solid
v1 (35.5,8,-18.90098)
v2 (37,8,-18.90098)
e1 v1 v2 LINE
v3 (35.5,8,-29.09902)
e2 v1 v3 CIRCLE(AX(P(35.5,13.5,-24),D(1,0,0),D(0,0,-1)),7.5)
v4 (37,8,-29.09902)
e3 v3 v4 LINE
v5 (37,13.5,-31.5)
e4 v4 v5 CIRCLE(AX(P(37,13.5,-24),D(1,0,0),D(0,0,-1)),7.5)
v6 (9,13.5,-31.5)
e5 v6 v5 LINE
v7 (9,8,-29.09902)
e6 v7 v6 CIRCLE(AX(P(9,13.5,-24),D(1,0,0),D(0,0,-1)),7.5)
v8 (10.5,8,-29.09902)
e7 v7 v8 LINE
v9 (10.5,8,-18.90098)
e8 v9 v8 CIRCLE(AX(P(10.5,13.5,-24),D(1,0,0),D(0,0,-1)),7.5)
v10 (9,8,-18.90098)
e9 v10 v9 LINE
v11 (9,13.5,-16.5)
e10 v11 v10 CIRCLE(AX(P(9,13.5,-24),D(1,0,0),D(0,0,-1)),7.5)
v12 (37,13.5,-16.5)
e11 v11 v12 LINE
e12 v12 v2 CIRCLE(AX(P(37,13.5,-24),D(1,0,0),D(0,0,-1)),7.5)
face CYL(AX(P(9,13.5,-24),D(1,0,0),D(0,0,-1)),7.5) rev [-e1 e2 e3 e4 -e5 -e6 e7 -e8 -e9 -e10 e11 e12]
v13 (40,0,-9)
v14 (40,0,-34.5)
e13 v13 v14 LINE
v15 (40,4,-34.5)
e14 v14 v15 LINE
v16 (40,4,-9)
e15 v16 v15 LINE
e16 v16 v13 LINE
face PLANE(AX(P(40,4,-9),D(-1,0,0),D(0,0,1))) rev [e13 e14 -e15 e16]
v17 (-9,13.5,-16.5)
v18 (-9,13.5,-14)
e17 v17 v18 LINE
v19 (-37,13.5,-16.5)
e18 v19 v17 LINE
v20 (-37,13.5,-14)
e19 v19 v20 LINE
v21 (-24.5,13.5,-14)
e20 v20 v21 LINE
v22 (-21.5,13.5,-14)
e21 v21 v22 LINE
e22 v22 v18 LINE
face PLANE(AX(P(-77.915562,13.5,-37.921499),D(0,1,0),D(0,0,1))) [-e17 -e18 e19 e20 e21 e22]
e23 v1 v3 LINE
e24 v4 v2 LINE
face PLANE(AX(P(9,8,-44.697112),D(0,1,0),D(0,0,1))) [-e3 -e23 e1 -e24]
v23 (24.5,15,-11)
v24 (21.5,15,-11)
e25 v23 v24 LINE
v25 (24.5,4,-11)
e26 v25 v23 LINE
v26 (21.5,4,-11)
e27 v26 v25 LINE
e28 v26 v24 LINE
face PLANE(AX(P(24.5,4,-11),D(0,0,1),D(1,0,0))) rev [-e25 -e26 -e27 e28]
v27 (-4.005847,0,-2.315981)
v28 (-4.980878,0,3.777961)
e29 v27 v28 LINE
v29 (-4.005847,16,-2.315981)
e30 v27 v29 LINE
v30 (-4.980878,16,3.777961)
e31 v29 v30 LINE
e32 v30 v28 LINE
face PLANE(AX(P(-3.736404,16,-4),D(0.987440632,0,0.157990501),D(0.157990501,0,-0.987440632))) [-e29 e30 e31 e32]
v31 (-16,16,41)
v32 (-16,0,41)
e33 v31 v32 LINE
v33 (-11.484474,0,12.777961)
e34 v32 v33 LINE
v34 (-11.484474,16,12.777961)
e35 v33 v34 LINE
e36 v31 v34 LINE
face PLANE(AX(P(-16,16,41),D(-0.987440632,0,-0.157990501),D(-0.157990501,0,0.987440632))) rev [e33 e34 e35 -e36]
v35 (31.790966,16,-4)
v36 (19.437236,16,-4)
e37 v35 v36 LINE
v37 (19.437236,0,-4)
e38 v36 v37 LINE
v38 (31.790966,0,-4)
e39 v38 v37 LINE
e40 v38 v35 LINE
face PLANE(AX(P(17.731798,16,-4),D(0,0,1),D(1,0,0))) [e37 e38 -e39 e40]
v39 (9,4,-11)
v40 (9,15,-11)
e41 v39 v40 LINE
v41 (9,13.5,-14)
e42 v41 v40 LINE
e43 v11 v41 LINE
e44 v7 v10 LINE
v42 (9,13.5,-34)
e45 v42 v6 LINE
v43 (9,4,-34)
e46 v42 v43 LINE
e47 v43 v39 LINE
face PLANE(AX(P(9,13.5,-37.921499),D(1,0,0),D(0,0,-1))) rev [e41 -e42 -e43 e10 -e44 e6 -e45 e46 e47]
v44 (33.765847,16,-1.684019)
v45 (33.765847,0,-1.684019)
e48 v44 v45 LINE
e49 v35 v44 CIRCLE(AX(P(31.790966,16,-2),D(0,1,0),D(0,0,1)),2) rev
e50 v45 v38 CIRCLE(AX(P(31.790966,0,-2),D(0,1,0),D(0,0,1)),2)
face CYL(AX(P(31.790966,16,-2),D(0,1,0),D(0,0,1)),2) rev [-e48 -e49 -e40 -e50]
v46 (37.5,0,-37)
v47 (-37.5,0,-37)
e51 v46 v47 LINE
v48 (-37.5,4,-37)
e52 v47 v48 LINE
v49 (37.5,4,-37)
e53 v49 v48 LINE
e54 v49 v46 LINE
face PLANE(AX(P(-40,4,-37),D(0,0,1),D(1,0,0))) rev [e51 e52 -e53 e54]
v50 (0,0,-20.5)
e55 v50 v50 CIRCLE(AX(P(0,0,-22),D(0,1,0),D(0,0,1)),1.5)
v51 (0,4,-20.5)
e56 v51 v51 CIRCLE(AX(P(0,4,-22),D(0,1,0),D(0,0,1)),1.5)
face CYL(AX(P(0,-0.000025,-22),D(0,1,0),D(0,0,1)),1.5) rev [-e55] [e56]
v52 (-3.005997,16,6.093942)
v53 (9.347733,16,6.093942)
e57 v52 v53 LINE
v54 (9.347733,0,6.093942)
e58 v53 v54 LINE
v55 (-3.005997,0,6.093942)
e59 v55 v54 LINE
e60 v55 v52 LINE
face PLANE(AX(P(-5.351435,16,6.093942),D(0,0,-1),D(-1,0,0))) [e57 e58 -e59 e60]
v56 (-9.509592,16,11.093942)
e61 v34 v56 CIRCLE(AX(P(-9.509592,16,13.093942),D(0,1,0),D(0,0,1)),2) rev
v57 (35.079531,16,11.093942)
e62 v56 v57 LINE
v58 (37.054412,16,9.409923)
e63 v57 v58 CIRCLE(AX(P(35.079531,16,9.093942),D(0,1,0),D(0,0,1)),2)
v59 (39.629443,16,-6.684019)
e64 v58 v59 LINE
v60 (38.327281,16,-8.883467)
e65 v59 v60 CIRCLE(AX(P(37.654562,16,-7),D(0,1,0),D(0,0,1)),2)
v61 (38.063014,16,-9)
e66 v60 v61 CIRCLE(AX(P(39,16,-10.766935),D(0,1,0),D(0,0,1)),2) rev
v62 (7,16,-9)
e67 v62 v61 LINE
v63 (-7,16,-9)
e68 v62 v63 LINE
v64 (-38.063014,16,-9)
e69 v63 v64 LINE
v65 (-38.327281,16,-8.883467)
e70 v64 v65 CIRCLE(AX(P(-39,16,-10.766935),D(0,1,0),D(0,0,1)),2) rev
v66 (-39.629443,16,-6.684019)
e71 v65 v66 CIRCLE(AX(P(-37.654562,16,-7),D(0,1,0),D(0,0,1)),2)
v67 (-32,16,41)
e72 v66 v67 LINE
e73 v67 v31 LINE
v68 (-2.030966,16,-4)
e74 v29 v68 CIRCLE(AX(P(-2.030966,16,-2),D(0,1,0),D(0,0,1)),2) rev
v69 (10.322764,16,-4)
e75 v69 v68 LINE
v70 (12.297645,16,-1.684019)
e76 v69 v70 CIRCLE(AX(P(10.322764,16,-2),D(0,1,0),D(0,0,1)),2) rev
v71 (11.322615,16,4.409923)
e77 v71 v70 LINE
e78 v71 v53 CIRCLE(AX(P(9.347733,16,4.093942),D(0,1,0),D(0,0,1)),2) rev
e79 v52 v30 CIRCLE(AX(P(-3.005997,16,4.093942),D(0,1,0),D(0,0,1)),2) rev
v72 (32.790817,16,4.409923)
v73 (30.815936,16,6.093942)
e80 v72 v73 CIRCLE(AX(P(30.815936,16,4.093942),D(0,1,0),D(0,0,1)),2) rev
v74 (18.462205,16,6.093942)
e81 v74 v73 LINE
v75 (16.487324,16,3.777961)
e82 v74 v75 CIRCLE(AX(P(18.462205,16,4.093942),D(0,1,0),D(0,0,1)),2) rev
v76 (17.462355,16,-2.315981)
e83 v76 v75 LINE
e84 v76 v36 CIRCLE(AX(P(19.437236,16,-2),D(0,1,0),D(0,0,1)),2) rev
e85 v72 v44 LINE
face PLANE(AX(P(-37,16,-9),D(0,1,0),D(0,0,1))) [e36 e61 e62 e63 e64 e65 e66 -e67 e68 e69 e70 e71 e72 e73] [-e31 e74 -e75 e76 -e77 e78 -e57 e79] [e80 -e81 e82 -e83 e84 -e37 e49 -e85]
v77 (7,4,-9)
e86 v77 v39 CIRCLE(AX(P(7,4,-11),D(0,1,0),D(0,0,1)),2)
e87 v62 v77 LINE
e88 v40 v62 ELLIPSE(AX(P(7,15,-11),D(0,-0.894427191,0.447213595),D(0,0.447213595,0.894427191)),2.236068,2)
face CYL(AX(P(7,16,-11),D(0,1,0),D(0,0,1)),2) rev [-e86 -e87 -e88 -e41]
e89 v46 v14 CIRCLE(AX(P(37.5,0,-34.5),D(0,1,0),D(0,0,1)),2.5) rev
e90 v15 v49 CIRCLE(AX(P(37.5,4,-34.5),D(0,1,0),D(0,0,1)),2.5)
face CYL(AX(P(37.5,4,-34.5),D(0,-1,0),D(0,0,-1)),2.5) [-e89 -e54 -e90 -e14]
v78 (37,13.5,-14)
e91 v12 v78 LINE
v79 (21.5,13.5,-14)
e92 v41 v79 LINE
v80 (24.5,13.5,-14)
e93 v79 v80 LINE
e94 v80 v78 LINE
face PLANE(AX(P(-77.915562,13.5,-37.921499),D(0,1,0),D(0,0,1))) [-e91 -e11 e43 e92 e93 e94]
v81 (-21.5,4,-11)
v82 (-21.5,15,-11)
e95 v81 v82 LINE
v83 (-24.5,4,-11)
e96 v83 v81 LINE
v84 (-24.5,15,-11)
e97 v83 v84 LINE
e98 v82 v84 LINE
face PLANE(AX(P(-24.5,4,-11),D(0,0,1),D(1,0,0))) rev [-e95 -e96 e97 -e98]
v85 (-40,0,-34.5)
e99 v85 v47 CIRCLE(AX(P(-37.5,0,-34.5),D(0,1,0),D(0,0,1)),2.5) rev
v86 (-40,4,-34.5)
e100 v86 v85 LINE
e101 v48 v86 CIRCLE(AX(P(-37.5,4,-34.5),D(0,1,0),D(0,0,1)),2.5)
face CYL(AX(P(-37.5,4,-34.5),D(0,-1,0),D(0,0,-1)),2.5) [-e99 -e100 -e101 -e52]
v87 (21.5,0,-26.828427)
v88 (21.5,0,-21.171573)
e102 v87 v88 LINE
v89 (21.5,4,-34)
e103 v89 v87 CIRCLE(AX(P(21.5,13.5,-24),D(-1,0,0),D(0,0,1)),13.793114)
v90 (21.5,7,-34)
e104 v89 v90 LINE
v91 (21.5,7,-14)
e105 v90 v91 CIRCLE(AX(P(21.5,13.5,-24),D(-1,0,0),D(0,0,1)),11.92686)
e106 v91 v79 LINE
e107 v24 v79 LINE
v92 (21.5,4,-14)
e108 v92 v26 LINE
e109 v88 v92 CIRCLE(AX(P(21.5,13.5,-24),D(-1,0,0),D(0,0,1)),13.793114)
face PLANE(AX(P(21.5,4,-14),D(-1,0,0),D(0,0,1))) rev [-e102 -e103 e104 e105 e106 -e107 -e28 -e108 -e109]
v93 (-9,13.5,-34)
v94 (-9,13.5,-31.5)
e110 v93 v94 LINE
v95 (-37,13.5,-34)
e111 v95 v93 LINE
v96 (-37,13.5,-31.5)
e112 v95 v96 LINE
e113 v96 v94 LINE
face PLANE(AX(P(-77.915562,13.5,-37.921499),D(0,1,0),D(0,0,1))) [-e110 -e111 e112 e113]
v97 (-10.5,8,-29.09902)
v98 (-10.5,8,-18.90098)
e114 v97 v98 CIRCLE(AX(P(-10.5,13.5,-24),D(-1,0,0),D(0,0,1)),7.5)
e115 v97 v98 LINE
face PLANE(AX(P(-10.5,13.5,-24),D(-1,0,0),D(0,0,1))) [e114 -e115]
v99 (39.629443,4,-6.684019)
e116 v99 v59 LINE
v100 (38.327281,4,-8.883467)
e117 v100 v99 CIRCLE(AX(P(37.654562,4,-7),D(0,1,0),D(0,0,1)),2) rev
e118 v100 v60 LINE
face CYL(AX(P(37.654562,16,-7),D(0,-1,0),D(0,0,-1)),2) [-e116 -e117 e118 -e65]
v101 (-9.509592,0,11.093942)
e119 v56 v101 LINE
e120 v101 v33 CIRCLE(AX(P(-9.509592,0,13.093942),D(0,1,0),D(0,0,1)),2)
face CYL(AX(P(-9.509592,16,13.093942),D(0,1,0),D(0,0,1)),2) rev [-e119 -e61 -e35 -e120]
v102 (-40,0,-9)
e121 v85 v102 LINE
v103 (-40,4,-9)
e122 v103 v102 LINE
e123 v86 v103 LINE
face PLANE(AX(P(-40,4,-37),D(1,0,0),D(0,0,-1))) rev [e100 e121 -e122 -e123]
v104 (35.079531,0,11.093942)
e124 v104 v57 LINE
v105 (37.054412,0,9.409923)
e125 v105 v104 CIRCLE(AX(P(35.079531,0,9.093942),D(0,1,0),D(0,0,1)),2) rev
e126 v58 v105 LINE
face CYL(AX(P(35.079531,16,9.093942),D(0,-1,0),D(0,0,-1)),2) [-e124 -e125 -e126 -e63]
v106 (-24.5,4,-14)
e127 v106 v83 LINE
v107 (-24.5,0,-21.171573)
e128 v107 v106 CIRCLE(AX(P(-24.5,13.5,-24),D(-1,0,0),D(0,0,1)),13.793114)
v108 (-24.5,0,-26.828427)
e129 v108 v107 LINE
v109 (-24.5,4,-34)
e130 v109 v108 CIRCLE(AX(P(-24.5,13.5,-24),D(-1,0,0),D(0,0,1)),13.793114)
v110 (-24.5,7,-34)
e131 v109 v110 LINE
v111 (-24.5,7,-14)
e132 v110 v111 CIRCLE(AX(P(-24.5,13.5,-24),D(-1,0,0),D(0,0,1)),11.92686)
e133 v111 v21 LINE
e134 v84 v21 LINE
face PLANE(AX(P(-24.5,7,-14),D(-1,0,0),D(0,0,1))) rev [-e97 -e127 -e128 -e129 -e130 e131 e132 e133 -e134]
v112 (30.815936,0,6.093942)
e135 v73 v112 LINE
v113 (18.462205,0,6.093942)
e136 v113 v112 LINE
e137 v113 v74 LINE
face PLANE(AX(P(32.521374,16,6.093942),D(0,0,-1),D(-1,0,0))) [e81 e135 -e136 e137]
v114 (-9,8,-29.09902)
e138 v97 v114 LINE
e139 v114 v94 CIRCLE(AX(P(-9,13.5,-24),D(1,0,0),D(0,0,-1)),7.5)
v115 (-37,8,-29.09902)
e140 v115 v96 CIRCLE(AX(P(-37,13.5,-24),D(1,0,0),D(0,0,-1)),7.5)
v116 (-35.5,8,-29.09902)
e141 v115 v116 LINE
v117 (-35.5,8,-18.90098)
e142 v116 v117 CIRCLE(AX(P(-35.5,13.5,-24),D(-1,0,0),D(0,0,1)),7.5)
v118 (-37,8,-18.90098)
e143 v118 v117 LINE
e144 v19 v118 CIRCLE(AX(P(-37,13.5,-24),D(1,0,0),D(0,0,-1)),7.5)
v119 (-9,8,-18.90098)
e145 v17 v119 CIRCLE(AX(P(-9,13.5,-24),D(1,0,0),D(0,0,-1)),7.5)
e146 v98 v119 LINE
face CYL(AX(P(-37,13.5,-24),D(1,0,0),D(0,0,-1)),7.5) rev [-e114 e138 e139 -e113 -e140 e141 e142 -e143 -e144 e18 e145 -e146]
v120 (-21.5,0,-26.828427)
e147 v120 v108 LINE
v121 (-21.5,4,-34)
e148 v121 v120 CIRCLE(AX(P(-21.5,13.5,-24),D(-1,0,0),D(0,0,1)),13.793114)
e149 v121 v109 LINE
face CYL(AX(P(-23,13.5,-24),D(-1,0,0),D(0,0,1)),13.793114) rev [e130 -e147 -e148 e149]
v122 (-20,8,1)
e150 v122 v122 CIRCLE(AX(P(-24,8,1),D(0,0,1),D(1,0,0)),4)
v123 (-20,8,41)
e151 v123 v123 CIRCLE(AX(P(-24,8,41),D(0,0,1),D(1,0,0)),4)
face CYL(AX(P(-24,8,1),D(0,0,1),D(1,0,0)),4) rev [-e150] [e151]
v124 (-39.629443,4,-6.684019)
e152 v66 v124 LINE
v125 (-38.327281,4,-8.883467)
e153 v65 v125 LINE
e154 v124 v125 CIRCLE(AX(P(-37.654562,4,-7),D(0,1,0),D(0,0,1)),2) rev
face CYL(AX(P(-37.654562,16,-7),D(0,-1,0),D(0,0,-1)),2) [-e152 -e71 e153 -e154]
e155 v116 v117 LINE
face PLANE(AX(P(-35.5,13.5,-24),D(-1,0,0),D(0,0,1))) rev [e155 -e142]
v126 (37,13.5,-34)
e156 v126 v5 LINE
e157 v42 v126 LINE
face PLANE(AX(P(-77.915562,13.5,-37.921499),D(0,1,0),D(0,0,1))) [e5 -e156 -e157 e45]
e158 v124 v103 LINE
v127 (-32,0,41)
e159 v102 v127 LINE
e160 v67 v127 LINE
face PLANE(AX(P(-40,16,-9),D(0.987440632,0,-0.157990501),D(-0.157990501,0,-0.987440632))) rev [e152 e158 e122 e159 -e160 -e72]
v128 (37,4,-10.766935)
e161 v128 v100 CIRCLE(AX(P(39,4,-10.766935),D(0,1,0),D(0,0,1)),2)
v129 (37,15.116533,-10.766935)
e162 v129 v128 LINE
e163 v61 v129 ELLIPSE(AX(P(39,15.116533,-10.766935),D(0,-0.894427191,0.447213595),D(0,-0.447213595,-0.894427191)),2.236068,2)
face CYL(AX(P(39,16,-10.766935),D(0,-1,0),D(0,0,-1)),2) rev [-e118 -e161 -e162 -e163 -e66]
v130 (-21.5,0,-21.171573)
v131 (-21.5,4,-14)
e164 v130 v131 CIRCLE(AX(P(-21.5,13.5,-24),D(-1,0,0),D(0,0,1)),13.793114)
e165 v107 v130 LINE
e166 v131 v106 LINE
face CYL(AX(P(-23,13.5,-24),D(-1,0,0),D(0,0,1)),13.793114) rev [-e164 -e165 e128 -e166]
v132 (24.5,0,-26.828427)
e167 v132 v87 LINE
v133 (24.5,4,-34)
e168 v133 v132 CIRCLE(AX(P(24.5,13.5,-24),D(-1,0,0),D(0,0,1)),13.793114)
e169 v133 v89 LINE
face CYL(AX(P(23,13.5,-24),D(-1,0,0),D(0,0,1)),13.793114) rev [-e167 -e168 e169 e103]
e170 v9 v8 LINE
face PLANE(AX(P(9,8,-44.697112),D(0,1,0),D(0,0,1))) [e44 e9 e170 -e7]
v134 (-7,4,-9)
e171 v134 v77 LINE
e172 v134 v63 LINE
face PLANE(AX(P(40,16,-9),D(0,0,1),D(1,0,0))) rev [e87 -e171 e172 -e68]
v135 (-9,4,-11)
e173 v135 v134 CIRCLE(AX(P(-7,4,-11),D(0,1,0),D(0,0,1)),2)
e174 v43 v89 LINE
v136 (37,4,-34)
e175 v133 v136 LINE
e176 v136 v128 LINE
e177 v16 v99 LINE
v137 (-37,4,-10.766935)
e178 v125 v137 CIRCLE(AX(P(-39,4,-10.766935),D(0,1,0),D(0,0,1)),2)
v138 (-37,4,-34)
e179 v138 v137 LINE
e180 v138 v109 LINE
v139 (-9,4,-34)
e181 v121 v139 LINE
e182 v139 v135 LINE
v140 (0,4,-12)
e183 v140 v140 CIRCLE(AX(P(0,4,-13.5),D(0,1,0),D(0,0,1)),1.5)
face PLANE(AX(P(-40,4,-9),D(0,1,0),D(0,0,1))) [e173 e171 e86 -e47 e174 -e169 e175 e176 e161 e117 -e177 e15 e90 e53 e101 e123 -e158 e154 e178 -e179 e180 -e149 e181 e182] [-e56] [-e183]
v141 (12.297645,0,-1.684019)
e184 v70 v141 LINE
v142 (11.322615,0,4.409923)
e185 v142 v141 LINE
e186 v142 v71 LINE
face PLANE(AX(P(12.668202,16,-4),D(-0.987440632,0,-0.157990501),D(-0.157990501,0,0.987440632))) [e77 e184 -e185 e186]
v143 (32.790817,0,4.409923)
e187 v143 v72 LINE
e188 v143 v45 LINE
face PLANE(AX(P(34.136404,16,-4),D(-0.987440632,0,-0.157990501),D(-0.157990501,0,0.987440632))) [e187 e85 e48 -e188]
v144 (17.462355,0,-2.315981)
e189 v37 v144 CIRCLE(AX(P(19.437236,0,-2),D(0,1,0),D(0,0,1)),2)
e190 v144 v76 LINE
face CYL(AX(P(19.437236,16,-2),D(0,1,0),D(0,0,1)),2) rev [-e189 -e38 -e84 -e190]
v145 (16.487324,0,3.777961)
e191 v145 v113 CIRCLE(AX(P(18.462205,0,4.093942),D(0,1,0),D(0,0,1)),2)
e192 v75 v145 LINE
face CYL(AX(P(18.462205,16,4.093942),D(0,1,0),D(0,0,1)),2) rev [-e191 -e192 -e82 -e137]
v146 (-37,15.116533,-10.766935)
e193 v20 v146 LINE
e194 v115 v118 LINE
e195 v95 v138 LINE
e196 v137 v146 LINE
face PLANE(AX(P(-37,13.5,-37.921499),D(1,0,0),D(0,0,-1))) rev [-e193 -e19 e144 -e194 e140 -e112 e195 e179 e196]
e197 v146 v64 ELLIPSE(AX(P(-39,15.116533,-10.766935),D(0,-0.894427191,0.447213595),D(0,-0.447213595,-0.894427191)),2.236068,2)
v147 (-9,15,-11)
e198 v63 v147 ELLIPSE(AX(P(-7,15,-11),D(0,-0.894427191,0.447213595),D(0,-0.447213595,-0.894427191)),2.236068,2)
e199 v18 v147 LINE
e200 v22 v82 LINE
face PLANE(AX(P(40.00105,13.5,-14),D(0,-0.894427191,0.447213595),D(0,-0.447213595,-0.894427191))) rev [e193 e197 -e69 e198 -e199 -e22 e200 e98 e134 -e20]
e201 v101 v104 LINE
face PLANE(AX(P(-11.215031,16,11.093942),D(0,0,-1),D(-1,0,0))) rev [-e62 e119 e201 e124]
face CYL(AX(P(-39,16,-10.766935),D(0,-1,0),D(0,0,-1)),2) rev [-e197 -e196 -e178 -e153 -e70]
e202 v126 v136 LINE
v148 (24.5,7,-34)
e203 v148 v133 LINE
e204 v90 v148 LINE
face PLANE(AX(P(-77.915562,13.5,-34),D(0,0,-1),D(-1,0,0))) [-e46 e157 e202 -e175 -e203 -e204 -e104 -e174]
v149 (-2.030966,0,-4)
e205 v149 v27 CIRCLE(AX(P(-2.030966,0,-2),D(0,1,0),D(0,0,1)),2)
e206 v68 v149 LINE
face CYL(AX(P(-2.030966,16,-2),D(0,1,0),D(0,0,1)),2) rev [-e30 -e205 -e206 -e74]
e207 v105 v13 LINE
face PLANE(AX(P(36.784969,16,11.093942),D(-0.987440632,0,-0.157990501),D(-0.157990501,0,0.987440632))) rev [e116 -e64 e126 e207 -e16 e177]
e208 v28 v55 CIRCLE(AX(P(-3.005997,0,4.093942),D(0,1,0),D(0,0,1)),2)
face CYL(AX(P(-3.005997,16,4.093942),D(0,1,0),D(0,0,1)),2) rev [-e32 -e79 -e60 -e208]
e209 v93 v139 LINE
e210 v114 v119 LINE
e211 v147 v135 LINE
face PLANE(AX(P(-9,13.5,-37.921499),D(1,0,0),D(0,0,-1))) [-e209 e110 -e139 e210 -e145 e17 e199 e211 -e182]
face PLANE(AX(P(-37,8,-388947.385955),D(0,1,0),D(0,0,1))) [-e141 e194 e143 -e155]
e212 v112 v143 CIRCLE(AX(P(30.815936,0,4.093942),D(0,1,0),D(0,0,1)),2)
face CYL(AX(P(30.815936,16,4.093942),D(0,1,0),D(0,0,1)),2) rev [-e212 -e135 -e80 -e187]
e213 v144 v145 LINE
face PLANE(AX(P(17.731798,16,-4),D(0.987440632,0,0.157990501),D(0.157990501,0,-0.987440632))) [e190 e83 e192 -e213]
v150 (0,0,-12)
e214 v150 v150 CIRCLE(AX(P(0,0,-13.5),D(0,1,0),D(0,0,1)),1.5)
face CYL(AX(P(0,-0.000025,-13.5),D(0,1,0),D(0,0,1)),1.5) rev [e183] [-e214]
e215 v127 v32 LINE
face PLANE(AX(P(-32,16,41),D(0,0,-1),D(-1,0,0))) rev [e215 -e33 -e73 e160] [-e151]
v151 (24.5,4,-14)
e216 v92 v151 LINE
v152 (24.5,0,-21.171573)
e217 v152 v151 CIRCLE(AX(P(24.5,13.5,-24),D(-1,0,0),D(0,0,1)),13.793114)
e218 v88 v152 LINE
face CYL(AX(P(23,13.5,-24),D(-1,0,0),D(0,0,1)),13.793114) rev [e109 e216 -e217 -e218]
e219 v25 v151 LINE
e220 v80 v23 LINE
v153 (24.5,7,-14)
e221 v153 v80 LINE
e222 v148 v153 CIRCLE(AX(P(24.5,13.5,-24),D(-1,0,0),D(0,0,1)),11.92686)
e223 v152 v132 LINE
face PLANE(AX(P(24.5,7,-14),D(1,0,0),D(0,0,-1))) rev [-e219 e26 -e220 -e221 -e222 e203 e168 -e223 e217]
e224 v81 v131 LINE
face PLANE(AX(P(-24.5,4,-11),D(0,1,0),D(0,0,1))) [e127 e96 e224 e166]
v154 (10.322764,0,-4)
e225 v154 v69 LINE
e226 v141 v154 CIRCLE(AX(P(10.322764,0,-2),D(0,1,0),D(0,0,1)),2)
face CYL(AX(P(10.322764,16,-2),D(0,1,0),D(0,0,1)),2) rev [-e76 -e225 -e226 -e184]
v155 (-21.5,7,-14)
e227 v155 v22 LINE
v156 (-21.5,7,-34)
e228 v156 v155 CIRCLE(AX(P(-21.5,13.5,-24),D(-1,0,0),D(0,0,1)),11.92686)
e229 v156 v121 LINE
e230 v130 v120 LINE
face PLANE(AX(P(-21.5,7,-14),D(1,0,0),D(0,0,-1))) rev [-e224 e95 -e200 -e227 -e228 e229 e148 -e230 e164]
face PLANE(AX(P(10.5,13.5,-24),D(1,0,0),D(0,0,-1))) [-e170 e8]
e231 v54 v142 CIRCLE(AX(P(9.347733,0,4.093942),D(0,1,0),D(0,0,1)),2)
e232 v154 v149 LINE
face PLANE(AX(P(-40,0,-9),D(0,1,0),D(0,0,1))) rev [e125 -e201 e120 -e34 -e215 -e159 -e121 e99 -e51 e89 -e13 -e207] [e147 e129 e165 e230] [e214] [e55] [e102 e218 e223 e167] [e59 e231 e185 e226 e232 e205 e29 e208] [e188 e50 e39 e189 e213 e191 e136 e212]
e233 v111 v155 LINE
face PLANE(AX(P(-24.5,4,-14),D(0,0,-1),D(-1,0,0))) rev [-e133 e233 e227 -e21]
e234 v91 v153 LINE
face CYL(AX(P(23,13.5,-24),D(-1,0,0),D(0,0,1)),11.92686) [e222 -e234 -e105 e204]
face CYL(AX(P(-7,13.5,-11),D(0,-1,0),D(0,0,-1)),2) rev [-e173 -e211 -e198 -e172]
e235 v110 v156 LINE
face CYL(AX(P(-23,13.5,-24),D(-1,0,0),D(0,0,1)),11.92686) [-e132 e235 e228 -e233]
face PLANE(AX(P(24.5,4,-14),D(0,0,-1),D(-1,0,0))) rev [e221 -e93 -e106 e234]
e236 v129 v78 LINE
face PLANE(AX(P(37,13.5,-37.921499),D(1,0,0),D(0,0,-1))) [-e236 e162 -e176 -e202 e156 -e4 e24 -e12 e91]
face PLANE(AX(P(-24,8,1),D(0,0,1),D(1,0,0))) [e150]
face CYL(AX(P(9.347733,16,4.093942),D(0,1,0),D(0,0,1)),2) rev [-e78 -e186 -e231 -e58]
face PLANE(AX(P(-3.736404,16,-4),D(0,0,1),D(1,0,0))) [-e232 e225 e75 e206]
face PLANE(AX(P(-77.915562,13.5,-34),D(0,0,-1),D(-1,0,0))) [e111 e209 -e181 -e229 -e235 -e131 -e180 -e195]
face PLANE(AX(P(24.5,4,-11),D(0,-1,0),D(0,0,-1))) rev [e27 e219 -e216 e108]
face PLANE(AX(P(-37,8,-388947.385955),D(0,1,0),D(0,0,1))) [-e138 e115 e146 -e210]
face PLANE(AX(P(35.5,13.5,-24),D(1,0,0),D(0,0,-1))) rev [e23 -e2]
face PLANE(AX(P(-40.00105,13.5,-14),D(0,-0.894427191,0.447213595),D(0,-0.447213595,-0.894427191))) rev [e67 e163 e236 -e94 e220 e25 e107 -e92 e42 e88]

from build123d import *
from build123d.topology import SkipClean

# Parameters (mm, degrees)
SKETCH7_W       = 80
SKETCH7_H       = 28
EXTRUDE2_DEPTH  = 4
SKETCH8_W       = 28
SKETCH8_H       = 20
EXTRUDE3_DEPTH  = 9.5
EXTRUDE6_DEPTH  = 28
SKETCH15_R      = 7.5
EXTRUDE7_DEPTH  = 25
SKETCH16_W      = 3
SKETCH16_H      = 3
SKETCH8_4_W     = 28
SKETCH8_4_H     = 20
EXTRUDE8_DEPTH  = 9.5
EXTRUDE9_DEPTH  = 28
SKETCH19_R      = 7.5
EXTRUDE10_DEPTH = 25
SKETCH20_W      = 3
SKETCH20_H      = 3
FILLET1_R       = 2.5
EXTRUDE11_DEPTH = 16
SKETCH25_W      = 28
SKETCH25_H      = 5
EXTRUDE13_DEPTH = 12
EXTRUDE14_REACH = 90.69
FILLET11_R      = 2
SKETCH27_W      = 28
SKETCH27_H      = 5
EXTRUDE15_DEPTH = 12
EXTRUDE16_REACH = 90.69
FILLET14_R      = 2
SKETCH30_W      = 3
SKETCH30_H      = 3
EXTRUDE17_DEPTH = 12
SKETCH31_W      = 3
SKETCH31_H      = 3
EXTRUDE18_DEPTH = 12
SKETCH32_R      = 4
EXTRUDE19_DEPTH = 40
FILLET15_R      = 2
FILLET16_R      = 2
FILLET17_R      = 2
FILLET18_R      = 2
FILLET19_R      = 2
FILLET20_R      = 2
FILLET21_R      = 2
SKETCH33_R      = 1.5
EXTRUDE20_DEPTH = 59.523499692


with BuildPart() as part:
    # Sketch7 → Extrude2 (new body)
    with BuildSketch(Plane(origin=(0, 0, 0), x_dir=(1, 0, 0), z_dir=(0, 1, 0))):
        with Locations((0, 23)):
            Rectangle(SKETCH7_W, SKETCH7_H)
    extrude(amount=EXTRUDE2_DEPTH)


with BuildPart() as body_2:
    # Sketch8 → Extrude3 (new body)
    with BuildSketch(Plane(origin=(0, 4, 0), x_dir=(1, 0, 0), z_dir=(0, 1, 0))):
        with Locations((-23, 24)):
            Rectangle(SKETCH8_W, SKETCH8_H)
    extrude(amount=EXTRUDE3_DEPTH)

    # Sketch10 → Extrude6 (cut)
    with BuildSketch(Plane(origin=(-9, 0, 0), x_dir=(0, 0, -1), z_dir=(1, 0, 0))):
        with BuildLine():
            Line((31.5, 13.5), (24, 13.5))
            Line((24, 13.5), (16.5, 13.5))
            ThreePointArc((16.5, 13.5), (17.126403912, 10.499387259), (18.900980486, 8))
            Line((18.900980486, 8), (29.099019514, 8))
            ThreePointArc((29.099019514, 8), (30.873596088, 10.499387259), (31.5, 13.5))
        make_face()
    extrude(amount=-EXTRUDE6_DEPTH, mode=Mode.SUBTRACT)

    # Sketch15 → Extrude7 (cut)
    with SkipClean():  # the faces are left unmerged after this step: merging them gives an invalid solid
        with BuildSketch(Plane.ZY.offset(35.5)):
            with Locations((-24, 13.5)):
                Circle(SKETCH15_R)
        extrude(amount=-EXTRUDE7_DEPTH, mode=Mode.SUBTRACT)


with BuildPart() as cut_sweep1_tool:
    # Cut-Sweep1: sweep along a path in Sketch17
    with SkipClean():  # the faces are left unmerged after this step: merging them gives an invalid solid
        with BuildLine(Plane(origin=(-23, 0, 0), x_dir=(0, 0, -1), z_dir=(1, 0, 0))) as cut_sweep1_path:
            CenterArc((24, 13.5), 12.806248475, 0, 360)
        # Sketch16 → Cut-Sweep1 (sweep)
        with BuildSketch(Plane.XY.offset(-14)):
            with Locations((-23, 5.5)):
                Rectangle(SKETCH16_W, SKETCH16_H)
        sweep(path=cut_sweep1_path.line)


with BuildPart() as part_1:
    with SkipClean():  # the faces are left unmerged after this step: merging them gives an invalid solid
        add(part.part)

        # Cut-Sweep1: cut by cut_sweep1_tool
        add(cut_sweep1_tool.part, mode=Mode.SUBTRACT)

    # Sketch8<4> → Extrude8 (add)
    with BuildSketch(Plane(origin=(0, 4, 0), x_dir=(1, 0, 0), z_dir=(0, 1, 0))):
        with Locations((23, 24)):
            Rectangle(SKETCH8_4_W, SKETCH8_4_H)
    extrude(amount=EXTRUDE8_DEPTH)

    # Sketch18 → Extrude9 (cut)
    with BuildSketch(Plane(origin=(37, 0, 0), x_dir=(0, 0, -1), z_dir=(1, 0, 0))):
        with BuildLine():
            Line((18.900980486, 8), (29.099019514, 8))
            ThreePointArc((29.099019514, 8), (30.873596088, 10.499387259), (31.5, 13.5))
            Line((31.5, 13.5), (16.5, 13.5))
            ThreePointArc((16.5, 13.5), (17.126403912, 10.499387259), (18.900980486, 8))
        make_face()
    extrude(amount=-EXTRUDE9_DEPTH, mode=Mode.SUBTRACT)

    # Sketch19 → Extrude10 (cut)
    with BuildSketch(Plane(origin=(35.5, 0, 0), x_dir=(0, 0, -1), z_dir=(1, 0, 0))):
        with Locations((24, 13.5)):
            Circle(SKETCH19_R)
    extrude(amount=-EXTRUDE10_DEPTH, mode=Mode.SUBTRACT)

    # Cut-Sweep2: sweep along a path in Sketch21
    with BuildLine(Plane(origin=(23, 0, 0), x_dir=(0, 0, -1), z_dir=(1, 0, 0))) as cut_sweep2_path:
        CenterArc((24, 13.5), 12.806248475, 0, 360)
    # Sketch20 → Cut-Sweep2 (sweep, cut)
    with BuildSketch(Plane.XY.offset(-14)):
        with Locations((23, 5.5)):
            Rectangle(SKETCH20_W, SKETCH20_H)
    sweep(path=cut_sweep2_path.line, mode=Mode.SUBTRACT)

    # Fillet1
    fillet1_edges = [part_1.edges().sort_by_distance(p)[0] for p in [
        (-40, 2, -37),
        (40, 2, -37),
    ]]
    fillet(fillet1_edges, radius=FILLET1_R)

    # Sketch22 → Extrude11 (add)
    with BuildSketch(Plane(origin=(0, 0, 0), x_dir=(1, 0, 0), z_dir=(0, 1, 0))):
        Polygon((36.784969303, -11.093941854), (40, 9), (-40, 9), (-32, -41), (-16, -41), (-11.215030697, -11.093941854), align=None)
        Polygon((12.66820222, 4), (11.053171523, -6.093941854), (-5.351435136, -6.093941854), (-3.73640444, 4), align=None, mode=Mode.SUBTRACT)
        Polygon((17.73179778, 4), (34.13640444, 4), (32.521373743, -6.093941854), (16.116767084, -6.093941854), align=None, mode=Mode.SUBTRACT)
    extrude(amount=EXTRUDE11_DEPTH)



with BuildPart() as body_2_1:
    with SkipClean():  # the faces are left unmerged after this step: merging them gives an invalid solid
        add(body_2.part)

        # Cut-Sweep1: cut by cut_sweep1_tool
        add(cut_sweep1_tool.part, mode=Mode.SUBTRACT)


with BuildPart() as part_2:
    with SkipClean():  # the faces are left unmerged after this step: merging them gives an invalid solid
        add(part_1.part)

        add(body_2_1.part)  # Extrude13 merges body 2
        # Sketch25 → Extrude13 (add)
        with BuildSketch(Plane(origin=(0, 4, 0), x_dir=(-1, 0, 0), z_dir=(0, 1, 0))):
            with Locations((23, -11.5)):
                Rectangle(SKETCH25_W, SKETCH25_H)
        extrude(amount=EXTRUDE13_DEPTH)

    # Sketch26 → Extrude14 (cut, up to next)
    with BuildSketch(Plane.ZY.offset(37), mode=Mode.PRIVATE) as extrude14_sk1:
        Polygon((-14, 13.5), (-9, 16), (-14, 16), align=None)
    extrude14_tool1 = extrude(extrude14_sk1.sketch, amount=-EXTRUDE14_REACH, mode=Mode.PRIVATE) & part_2.part
    add(extrude14_tool1.solids().sort_by_distance((-37, 15.166667, -12.333333))[0], mode=Mode.SUBTRACT)

    # Fillet11
    fillet11_edges = [part_2.edges().sort_by_distance(p)[0] for p in [
        (-9, 10, -9),
    ]]
    fillet(fillet11_edges, radius=FILLET11_R)

    # Sketch27 → Extrude15 (add)
    with SkipClean():  # the faces are left unmerged after this step: merging them gives an invalid solid
        with BuildSketch(Plane(origin=(0, 4, 0), x_dir=(-1, 0, 0), z_dir=(0, 1, 0))):
            with Locations((-23, -11.5)):
                Rectangle(SKETCH27_W, SKETCH27_H)
        extrude(amount=EXTRUDE15_DEPTH)

    # Sketch28 → Extrude16 (cut, up to next)
    with BuildSketch(Plane(origin=(37, 0, 0), x_dir=(0, 0, -1), z_dir=(1, 0, 0)), mode=Mode.PRIVATE) as extrude16_sk1:
        Polygon((14, 13.5), (9, 16), (14, 16), align=None)
    extrude16_tool1 = extrude(extrude16_sk1.sketch, amount=-EXTRUDE16_REACH, mode=Mode.PRIVATE) & part_2.part
    add(extrude16_tool1.solids().sort_by_distance((37, 15.166667, -12.333333))[0], mode=Mode.SUBTRACT)

    # Fillet14
    fillet14_edges = [part_2.edges().sort_by_distance(p)[0] for p in [
        (9, 10, -9),
    ]]
    fillet(fillet14_edges, radius=FILLET14_R)

    # Sketch30 → Extrude17 (cut)
    with SkipClean():  # the faces are left unmerged after this step: merging them gives an invalid solid
        with BuildSketch(Plane(origin=(0, 16, 0), x_dir=(-1, 0, 0), z_dir=(0, 1, 0))):
            with Locations((-23, -12.5)):
                Rectangle(SKETCH30_W, SKETCH30_H)
        extrude(amount=-EXTRUDE17_DEPTH, mode=Mode.SUBTRACT)

    # Sketch31 → Extrude18 (cut)
    with SkipClean():  # the faces are left unmerged after this step: merging them gives an invalid solid
        with BuildSketch(Plane(origin=(0, 16, 0), x_dir=(-1, 0, 0), z_dir=(0, 1, 0))):
            with Locations((23, -12.5)):
                Rectangle(SKETCH31_W, SKETCH31_H)
        extrude(amount=-EXTRUDE18_DEPTH, mode=Mode.SUBTRACT)

    # Sketch32 → Extrude19 (cut)
    with SkipClean():  # the faces are left unmerged after this step: merging them gives an invalid solid
        with BuildSketch(Plane.XY.offset(41)):
            with Locations((-24, 8)):
                Circle(SKETCH32_R)
        extrude(amount=-EXTRUDE19_DEPTH, mode=Mode.SUBTRACT)

    # Fillet15
    fillet15_edges = [part_2.edges().sort_by_distance(p)[0] for p in [
        (-40, 10, -9),
    ]]
    fillet(fillet15_edges, radius=FILLET15_R)

    # Fillet16
    # the kernel refuses this fillet: 2 mm, written as the material it adds along each edge
    with BuildSketch(Plane(origin=(-37, -0.417336402, -9), x_dir=(0, 0, -1), z_dir=(0, 1, 0))) as fillet16_piece_1_section:
        with BuildLine():
            CenterArc((1.766934561, 2), FILLET16_R, 199.655233066, 70.344766934)
            Line((-0.11653272, 1.327280888), (-0.304879448, 1.260008977))
            ThreePointArc((-0.304879448, 1.260008977), (-0.2, 0.654561776), (-0.2, 0))
            Line((-0.2, 0), (0, -0.2))
            Line((0, -0.2), (1.766934561, -0.2))
            Line((1.766934561, -0.2), (1.766934561, 0))
        make_face()
    fillet16_piece_1 = extrude(amount=16.417336402, mode=Mode.PRIVATE)
    fillet16_piece_1 = split(fillet16_piece_1, bisect_by=Plane(origin=(-37.361885023, 0, -9.612553635), z_dir=(0, 1, 0)), keep=Keep.TOP, mode=Mode.PRIVATE)
    fillet16_piece_1 = split(fillet16_piece_1, bisect_by=Plane(origin=(-37.361885023, 14.554978546, -11.890042908), z_dir=(0, -0.8944271909999159, 0.44721359549995804)), keep=Keep.TOP, mode=Mode.PRIVATE)
    add(fillet16_piece_1)

    # Fillet17
    fillet17_edges = [part_2.edges().sort_by_distance(p)[0] for p in [
        (40, 10, -9),
    ]]
    fillet(fillet17_edges, radius=FILLET17_R)

    # Fillet18
    # the kernel refuses this fillet: 2 mm, written as the material it adds along each edge
    with BuildSketch(Plane(origin=(37, -0.417336402, -9), x_dir=(0.9961678888786428, 0, 0.08746163254289245), z_dir=(0, 1, 0))) as fillet18_piece_1_section:
        with BuildLine():
            CenterArc((1.837796796, 1.935086736), FILLET18_R, 185.017593378, 70.344766934)
            Line((-0.154538981, 1.760163471), (-0.353772559, 1.742671145))
            Line((-0.353772559, 1.742671145), (-0.199233578, -0.017492327))
            Line((-0.199233578, -0.017492327), (0.017492327, -0.199233578))
            ThreePointArc((0.017492327, -0.199233578), (0.669545749, -0.141984536), (1.281845737, -0.193508674))
            Line((1.281845737, -0.193508674), (1.332386742, 0))
        make_face()
    fillet18_piece_1 = extrude(amount=16.417336402, mode=Mode.PRIVATE)
    fillet18_piece_1 = split(fillet18_piece_1, bisect_by=Plane(origin=(37.361885023, 14.554978546, -11.890042908), z_dir=(0, -0.8944271909999157, 0.4472135954999582)), keep=Keep.TOP, mode=Mode.PRIVATE)
    fillet18_piece_1 = split(fillet18_piece_1, bisect_by=Plane(origin=(37.361885023, 0, -9.612553635), z_dir=(0, 1, 0)), keep=Keep.TOP, mode=Mode.PRIVATE)
    add(fillet18_piece_1)

    # Fillet19
    fillet19_edges = [part_2.edges().sort_by_distance(p)[0] for p in [
        (11.053171523, 8, 6.093941854),
        (32.521373743, 8, 6.093941854),
    ]]
    fillet(fillet19_edges, radius=FILLET19_R)

    # Fillet20
    fillet20_edges = [part_2.edges().sort_by_distance(p)[0] for p in [
        (36.784969303, 8, 11.093941854),
        (-3.73640444, 8, -4),
        (-5.351435136, 8, 6.093941854),
        (12.66820222, 8, -4),
        (34.13640444, 8, -4),
        (17.73179778, 8, -4),
        (16.116767084, 8, 6.093941854),
    ]]
    fillet(fillet20_edges, radius=FILLET20_R)

    # Fillet21
    fillet21_edges = [part_2.edges().sort_by_distance(p)[0] for p in [
        (-11.215030697, 8, 11.093941854),
    ]]
    fillet(fillet21_edges, radius=FILLET21_R)

    # Sketch33 → Extrude20 (cut, through all)
    with BuildSketch(Plane(origin=(0, 4, 0), x_dir=(-1, 0, 0), z_dir=(0, 1, 0))):
        with Locations(Location((0, -13.5, 0), (0, 0, 90))):
            Circle(SKETCH33_R)
        with Locations(Location((0, -22, 0), (0, 0, 90))):
            Circle(SKETCH33_R)
    extrude(amount=-EXTRUDE20_DEPTH, mode=Mode.SUBTRACT)


solid = part_2.part
